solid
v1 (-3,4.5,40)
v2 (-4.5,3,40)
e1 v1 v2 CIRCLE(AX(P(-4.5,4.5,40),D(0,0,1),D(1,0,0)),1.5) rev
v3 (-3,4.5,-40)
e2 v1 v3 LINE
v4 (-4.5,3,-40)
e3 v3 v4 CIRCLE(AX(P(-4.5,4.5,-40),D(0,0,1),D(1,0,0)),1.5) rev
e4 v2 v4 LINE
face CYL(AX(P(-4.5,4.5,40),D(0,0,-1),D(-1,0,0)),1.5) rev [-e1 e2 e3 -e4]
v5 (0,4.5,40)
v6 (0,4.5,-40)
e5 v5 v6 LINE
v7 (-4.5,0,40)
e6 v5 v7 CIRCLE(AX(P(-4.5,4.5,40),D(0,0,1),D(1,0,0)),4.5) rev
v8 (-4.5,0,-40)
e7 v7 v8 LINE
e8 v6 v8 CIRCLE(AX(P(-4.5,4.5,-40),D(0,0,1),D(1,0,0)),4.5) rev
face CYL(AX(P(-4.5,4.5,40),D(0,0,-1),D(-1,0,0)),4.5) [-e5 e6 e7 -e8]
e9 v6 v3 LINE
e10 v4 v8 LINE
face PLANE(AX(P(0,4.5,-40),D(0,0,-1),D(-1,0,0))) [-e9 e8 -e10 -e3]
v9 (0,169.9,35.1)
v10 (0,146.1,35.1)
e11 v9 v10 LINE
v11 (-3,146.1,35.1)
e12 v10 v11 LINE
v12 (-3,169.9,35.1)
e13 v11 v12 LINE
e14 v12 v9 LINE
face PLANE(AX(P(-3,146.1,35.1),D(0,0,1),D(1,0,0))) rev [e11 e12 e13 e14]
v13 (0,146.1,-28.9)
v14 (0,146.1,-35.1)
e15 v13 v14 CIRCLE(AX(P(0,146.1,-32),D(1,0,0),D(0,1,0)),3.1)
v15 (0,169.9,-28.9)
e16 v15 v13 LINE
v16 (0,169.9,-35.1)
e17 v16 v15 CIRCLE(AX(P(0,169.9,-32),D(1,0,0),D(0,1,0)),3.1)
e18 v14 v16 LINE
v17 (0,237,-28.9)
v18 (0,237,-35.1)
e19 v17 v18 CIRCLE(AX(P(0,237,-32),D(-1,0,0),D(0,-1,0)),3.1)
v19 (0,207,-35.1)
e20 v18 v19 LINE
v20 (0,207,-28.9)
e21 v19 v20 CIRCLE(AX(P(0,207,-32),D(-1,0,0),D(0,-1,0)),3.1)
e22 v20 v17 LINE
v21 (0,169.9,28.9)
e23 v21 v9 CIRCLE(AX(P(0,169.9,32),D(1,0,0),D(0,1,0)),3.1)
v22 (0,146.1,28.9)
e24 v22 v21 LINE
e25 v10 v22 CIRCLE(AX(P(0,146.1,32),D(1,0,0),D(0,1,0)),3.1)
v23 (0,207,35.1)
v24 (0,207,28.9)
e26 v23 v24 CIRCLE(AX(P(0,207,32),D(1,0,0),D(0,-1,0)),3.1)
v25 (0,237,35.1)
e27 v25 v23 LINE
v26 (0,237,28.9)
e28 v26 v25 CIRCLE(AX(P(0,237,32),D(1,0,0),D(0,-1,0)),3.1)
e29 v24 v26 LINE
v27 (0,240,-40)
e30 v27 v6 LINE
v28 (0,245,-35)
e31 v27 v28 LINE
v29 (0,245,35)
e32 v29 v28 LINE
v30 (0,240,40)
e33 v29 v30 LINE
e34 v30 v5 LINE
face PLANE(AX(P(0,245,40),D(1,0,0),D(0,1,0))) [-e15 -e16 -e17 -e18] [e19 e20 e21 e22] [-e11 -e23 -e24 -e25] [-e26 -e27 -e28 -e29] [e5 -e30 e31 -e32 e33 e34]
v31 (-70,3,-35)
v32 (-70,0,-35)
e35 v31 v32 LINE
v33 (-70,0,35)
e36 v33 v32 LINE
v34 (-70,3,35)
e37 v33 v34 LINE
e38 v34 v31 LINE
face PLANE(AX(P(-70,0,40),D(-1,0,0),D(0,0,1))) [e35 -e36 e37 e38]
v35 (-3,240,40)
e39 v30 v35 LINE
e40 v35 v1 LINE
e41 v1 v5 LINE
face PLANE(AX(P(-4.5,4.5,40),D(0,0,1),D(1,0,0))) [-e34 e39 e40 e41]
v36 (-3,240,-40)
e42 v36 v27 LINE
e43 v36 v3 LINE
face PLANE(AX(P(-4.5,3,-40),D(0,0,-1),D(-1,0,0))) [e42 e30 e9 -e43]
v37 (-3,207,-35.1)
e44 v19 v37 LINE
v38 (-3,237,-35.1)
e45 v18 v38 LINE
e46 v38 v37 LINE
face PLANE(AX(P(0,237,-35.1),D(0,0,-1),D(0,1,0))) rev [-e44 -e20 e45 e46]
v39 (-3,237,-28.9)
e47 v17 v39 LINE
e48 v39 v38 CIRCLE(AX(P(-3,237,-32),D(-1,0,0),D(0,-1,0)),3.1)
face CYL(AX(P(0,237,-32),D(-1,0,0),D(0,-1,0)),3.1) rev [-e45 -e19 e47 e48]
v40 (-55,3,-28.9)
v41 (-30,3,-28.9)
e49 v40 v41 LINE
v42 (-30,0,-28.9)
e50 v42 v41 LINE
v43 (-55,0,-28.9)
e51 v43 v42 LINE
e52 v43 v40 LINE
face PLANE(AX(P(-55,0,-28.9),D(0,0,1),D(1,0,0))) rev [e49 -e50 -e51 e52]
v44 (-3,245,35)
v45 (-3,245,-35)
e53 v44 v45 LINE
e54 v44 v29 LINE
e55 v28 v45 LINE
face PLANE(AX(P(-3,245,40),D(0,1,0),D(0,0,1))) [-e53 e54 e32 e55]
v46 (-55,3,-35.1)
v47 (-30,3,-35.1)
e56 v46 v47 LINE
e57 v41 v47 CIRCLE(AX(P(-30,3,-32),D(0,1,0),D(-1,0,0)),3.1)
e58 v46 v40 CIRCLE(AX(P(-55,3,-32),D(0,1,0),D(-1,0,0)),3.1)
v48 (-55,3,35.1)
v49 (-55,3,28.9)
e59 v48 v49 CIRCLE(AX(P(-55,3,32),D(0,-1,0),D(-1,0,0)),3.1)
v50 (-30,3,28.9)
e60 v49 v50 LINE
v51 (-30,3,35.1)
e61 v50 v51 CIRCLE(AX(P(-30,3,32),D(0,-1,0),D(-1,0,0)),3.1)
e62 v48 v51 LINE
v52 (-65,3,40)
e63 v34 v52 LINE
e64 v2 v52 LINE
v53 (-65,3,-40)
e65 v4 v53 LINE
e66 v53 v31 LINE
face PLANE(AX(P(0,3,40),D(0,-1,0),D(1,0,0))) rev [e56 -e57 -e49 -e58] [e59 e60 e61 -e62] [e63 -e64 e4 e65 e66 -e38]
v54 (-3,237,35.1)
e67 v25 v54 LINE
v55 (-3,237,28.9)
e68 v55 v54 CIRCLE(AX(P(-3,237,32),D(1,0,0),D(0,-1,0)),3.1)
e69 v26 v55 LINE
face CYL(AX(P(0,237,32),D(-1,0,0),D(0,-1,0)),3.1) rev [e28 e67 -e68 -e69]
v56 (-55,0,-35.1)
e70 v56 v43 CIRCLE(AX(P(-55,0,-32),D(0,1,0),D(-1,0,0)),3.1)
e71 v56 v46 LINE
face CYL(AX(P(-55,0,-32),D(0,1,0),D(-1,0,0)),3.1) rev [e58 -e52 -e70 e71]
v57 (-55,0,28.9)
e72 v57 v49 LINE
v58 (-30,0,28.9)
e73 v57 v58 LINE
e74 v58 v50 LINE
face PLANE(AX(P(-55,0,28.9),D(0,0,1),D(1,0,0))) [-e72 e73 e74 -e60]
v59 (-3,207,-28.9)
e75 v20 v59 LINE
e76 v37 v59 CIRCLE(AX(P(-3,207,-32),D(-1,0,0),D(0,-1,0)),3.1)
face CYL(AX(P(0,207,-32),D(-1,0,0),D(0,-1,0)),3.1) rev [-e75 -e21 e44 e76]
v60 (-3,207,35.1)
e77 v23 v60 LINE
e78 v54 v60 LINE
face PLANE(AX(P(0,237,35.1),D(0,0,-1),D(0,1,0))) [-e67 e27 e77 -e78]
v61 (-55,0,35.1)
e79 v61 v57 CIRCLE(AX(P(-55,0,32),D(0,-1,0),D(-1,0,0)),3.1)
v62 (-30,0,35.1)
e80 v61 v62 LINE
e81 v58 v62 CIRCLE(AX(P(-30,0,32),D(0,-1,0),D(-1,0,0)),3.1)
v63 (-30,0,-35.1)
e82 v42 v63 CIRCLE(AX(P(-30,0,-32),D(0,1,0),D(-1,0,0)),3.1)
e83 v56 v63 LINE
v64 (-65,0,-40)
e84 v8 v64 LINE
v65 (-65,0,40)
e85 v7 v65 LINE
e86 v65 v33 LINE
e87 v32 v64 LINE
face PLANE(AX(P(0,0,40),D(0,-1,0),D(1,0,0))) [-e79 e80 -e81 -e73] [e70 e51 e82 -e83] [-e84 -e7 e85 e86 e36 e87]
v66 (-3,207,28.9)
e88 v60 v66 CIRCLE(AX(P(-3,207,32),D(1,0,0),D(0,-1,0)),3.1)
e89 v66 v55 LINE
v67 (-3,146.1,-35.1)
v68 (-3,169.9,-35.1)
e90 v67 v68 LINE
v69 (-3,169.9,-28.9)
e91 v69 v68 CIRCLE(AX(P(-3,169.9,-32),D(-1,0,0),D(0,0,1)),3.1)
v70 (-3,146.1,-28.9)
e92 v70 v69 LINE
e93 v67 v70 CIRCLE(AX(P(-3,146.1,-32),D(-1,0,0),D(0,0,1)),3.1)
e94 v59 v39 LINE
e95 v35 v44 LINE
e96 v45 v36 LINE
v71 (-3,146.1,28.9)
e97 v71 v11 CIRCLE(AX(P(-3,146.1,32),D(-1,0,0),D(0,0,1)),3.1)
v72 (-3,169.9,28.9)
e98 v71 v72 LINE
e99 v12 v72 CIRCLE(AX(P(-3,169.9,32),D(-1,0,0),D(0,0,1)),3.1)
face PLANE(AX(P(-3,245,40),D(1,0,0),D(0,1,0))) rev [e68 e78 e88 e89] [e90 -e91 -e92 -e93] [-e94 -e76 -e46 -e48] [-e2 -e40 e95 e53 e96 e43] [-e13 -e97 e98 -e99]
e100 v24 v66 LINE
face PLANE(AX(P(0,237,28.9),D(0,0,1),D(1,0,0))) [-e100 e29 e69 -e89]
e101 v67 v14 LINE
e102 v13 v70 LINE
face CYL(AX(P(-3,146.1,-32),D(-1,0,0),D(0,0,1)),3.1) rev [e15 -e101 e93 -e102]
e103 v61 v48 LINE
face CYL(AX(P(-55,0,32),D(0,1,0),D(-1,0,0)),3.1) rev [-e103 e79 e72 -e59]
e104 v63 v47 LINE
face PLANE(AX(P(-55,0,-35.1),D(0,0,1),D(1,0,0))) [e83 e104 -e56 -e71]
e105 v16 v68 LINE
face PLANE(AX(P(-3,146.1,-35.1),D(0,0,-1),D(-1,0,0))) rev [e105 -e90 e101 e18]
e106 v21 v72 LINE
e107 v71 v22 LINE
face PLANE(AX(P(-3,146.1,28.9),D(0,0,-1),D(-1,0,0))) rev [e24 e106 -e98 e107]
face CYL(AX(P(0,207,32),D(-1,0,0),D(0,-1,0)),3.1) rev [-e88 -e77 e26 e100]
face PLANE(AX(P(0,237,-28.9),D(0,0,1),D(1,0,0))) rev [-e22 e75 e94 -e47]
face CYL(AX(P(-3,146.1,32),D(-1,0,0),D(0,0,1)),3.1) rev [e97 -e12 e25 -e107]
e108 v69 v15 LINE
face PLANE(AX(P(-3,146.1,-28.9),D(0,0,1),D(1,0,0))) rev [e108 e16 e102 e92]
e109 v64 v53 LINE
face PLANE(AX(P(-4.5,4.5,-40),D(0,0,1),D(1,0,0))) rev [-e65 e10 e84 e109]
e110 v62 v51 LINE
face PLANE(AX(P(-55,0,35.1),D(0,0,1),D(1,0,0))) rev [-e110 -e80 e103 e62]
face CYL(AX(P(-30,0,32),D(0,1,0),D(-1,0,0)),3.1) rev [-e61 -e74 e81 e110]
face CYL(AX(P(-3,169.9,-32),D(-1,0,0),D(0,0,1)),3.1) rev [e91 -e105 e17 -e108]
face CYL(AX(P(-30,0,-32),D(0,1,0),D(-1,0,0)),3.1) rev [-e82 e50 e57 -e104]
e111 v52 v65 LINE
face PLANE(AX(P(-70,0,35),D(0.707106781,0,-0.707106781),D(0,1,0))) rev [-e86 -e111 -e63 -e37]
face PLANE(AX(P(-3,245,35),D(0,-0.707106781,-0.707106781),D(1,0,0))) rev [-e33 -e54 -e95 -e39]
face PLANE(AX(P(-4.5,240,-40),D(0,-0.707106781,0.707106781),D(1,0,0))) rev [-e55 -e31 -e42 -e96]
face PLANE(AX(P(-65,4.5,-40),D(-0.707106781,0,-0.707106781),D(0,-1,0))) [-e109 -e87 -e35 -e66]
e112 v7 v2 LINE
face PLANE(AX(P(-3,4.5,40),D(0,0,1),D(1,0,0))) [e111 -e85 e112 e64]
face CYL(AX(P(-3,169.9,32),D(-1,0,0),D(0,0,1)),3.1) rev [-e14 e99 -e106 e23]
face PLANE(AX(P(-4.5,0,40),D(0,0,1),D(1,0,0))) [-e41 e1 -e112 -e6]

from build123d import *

# Parameters (mm, degrees)
SM_BASE_FLANGE_1_DEPTH      = 40
CHAMFER_1_SIZE              = 5
CUT_EXTRUDE_1_DEPTH         = 258.126428047
CUT_EXTRUDE_2_DEPTH         = 256.076459125
HOLE_START                  = -3
HOLE_WIZARD_6_2_6_2_1_DEPTH = 3


# Read off the part's stored shape, not the designer's step: Ø6.2 (6.2) 直径槽口1
# Sheet-metal steps are written as plain solids
with BuildPart() as part:
    # Sketch 2 → 基体-法兰1 (new, symmetric)
    with BuildSketch(Plane.XY):
        with BuildLine():
            Line((0, 245), (0, 4.5))
            ThreePointArc((0, 4.5), (-1.318019485, 1.318019485), (-4.5, 0))
            Line((-4.5, 0), (-70, 0))
            Line((-70, 0), (-70, 3))
            Line((-70, 3), (-4.5, 3))
            ThreePointArc((-4.5, 3), (-3.439339828, 3.439339828), (-3, 4.5))
            Line((-3, 4.5), (-3, 245))
            Line((-3, 245), (0, 245))
        make_face()
    extrude(amount=SM_BASE_FLANGE_1_DEPTH, both=True)

    # 倒角1
    chamfer_1_edges = [part.edges().sort_by_distance(p)[0] for p in [
        (-1.5, 245, 40),
        (-70, 1.5, 40),
        (-1.5, 245, -40),
        (-70, 1.5, -40),
    ]]
    chamfer(chamfer_1_edges, length=CHAMFER_1_SIZE)

    # 草图7 → 切除-拉伸1 (cut, through all)
    with BuildSketch(Plane.ZY.offset(3)):
        with BuildLine():
            Line((-28.9, 237), (-28.9, 207))
            ThreePointArc((-28.9, 207), (-32, 203.9), (-35.1, 207))
            Line((-35.1, 207), (-35.1, 237))
            ThreePointArc((-35.1, 237), (-32, 240.1), (-28.9, 237))
        make_face()
    cut_extrude_1 = extrude(amount=-CUT_EXTRUDE_1_DEPTH, mode=Mode.SUBTRACT)

    # 草图10 → 切除-拉伸2 (cut, through all)
    with BuildSketch(Plane(origin=(0, 3, 0), x_dir=(1, 0, 0), z_dir=(0, 1, 0))):
        with BuildLine():
            Line((-55, 35.1), (-30, 35.1))
            ThreePointArc((-30, 35.1), (-26.9, 32), (-30, 28.9))
            Line((-30, 28.9), (-55, 28.9))
            ThreePointArc((-55, 28.9), (-58.1, 32), (-55, 35.1))
        make_face()
    cut_extrude_2 = extrude(amount=-CUT_EXTRUDE_2_DEPTH, mode=Mode.SUBTRACT)

    # 镜向1: 切除-拉伸1, 切除-拉伸2 across plane
    add(cut_extrude_1.mirror(Plane.XY), mode=Mode.SUBTRACT)
    add(cut_extrude_2.mirror(Plane.XY), mode=Mode.SUBTRACT)

    # Ø6.2 (6.2) 直径槽口1 outline → Ø6.2 (6.2) 直径槽口1 (cut)
    with BuildSketch(Plane.YZ.offset(HOLE_START)):
        with BuildLine():
            ThreePointArc((169.9, -35.1), (173, -32), (169.9, -28.9))
            Line((169.9, -28.9), (146.1, -28.9))
            ThreePointArc((146.1, -28.9), (143, -32), (146.1, -35.1))
            Line((146.1, -35.1), (169.9, -35.1))
        make_face()
        with BuildLine():
            ThreePointArc((169.9, 28.9), (173, 32), (169.9, 35.1))
            Line((169.9, 35.1), (146.1, 35.1))
            ThreePointArc((146.1, 35.1), (143, 32), (146.1, 28.9))
            Line((146.1, 28.9), (169.9, 28.9))
        make_face()
    extrude(amount=HOLE_WIZARD_6_2_6_2_1_DEPTH, mode=Mode.SUBTRACT)


solid = part.part
